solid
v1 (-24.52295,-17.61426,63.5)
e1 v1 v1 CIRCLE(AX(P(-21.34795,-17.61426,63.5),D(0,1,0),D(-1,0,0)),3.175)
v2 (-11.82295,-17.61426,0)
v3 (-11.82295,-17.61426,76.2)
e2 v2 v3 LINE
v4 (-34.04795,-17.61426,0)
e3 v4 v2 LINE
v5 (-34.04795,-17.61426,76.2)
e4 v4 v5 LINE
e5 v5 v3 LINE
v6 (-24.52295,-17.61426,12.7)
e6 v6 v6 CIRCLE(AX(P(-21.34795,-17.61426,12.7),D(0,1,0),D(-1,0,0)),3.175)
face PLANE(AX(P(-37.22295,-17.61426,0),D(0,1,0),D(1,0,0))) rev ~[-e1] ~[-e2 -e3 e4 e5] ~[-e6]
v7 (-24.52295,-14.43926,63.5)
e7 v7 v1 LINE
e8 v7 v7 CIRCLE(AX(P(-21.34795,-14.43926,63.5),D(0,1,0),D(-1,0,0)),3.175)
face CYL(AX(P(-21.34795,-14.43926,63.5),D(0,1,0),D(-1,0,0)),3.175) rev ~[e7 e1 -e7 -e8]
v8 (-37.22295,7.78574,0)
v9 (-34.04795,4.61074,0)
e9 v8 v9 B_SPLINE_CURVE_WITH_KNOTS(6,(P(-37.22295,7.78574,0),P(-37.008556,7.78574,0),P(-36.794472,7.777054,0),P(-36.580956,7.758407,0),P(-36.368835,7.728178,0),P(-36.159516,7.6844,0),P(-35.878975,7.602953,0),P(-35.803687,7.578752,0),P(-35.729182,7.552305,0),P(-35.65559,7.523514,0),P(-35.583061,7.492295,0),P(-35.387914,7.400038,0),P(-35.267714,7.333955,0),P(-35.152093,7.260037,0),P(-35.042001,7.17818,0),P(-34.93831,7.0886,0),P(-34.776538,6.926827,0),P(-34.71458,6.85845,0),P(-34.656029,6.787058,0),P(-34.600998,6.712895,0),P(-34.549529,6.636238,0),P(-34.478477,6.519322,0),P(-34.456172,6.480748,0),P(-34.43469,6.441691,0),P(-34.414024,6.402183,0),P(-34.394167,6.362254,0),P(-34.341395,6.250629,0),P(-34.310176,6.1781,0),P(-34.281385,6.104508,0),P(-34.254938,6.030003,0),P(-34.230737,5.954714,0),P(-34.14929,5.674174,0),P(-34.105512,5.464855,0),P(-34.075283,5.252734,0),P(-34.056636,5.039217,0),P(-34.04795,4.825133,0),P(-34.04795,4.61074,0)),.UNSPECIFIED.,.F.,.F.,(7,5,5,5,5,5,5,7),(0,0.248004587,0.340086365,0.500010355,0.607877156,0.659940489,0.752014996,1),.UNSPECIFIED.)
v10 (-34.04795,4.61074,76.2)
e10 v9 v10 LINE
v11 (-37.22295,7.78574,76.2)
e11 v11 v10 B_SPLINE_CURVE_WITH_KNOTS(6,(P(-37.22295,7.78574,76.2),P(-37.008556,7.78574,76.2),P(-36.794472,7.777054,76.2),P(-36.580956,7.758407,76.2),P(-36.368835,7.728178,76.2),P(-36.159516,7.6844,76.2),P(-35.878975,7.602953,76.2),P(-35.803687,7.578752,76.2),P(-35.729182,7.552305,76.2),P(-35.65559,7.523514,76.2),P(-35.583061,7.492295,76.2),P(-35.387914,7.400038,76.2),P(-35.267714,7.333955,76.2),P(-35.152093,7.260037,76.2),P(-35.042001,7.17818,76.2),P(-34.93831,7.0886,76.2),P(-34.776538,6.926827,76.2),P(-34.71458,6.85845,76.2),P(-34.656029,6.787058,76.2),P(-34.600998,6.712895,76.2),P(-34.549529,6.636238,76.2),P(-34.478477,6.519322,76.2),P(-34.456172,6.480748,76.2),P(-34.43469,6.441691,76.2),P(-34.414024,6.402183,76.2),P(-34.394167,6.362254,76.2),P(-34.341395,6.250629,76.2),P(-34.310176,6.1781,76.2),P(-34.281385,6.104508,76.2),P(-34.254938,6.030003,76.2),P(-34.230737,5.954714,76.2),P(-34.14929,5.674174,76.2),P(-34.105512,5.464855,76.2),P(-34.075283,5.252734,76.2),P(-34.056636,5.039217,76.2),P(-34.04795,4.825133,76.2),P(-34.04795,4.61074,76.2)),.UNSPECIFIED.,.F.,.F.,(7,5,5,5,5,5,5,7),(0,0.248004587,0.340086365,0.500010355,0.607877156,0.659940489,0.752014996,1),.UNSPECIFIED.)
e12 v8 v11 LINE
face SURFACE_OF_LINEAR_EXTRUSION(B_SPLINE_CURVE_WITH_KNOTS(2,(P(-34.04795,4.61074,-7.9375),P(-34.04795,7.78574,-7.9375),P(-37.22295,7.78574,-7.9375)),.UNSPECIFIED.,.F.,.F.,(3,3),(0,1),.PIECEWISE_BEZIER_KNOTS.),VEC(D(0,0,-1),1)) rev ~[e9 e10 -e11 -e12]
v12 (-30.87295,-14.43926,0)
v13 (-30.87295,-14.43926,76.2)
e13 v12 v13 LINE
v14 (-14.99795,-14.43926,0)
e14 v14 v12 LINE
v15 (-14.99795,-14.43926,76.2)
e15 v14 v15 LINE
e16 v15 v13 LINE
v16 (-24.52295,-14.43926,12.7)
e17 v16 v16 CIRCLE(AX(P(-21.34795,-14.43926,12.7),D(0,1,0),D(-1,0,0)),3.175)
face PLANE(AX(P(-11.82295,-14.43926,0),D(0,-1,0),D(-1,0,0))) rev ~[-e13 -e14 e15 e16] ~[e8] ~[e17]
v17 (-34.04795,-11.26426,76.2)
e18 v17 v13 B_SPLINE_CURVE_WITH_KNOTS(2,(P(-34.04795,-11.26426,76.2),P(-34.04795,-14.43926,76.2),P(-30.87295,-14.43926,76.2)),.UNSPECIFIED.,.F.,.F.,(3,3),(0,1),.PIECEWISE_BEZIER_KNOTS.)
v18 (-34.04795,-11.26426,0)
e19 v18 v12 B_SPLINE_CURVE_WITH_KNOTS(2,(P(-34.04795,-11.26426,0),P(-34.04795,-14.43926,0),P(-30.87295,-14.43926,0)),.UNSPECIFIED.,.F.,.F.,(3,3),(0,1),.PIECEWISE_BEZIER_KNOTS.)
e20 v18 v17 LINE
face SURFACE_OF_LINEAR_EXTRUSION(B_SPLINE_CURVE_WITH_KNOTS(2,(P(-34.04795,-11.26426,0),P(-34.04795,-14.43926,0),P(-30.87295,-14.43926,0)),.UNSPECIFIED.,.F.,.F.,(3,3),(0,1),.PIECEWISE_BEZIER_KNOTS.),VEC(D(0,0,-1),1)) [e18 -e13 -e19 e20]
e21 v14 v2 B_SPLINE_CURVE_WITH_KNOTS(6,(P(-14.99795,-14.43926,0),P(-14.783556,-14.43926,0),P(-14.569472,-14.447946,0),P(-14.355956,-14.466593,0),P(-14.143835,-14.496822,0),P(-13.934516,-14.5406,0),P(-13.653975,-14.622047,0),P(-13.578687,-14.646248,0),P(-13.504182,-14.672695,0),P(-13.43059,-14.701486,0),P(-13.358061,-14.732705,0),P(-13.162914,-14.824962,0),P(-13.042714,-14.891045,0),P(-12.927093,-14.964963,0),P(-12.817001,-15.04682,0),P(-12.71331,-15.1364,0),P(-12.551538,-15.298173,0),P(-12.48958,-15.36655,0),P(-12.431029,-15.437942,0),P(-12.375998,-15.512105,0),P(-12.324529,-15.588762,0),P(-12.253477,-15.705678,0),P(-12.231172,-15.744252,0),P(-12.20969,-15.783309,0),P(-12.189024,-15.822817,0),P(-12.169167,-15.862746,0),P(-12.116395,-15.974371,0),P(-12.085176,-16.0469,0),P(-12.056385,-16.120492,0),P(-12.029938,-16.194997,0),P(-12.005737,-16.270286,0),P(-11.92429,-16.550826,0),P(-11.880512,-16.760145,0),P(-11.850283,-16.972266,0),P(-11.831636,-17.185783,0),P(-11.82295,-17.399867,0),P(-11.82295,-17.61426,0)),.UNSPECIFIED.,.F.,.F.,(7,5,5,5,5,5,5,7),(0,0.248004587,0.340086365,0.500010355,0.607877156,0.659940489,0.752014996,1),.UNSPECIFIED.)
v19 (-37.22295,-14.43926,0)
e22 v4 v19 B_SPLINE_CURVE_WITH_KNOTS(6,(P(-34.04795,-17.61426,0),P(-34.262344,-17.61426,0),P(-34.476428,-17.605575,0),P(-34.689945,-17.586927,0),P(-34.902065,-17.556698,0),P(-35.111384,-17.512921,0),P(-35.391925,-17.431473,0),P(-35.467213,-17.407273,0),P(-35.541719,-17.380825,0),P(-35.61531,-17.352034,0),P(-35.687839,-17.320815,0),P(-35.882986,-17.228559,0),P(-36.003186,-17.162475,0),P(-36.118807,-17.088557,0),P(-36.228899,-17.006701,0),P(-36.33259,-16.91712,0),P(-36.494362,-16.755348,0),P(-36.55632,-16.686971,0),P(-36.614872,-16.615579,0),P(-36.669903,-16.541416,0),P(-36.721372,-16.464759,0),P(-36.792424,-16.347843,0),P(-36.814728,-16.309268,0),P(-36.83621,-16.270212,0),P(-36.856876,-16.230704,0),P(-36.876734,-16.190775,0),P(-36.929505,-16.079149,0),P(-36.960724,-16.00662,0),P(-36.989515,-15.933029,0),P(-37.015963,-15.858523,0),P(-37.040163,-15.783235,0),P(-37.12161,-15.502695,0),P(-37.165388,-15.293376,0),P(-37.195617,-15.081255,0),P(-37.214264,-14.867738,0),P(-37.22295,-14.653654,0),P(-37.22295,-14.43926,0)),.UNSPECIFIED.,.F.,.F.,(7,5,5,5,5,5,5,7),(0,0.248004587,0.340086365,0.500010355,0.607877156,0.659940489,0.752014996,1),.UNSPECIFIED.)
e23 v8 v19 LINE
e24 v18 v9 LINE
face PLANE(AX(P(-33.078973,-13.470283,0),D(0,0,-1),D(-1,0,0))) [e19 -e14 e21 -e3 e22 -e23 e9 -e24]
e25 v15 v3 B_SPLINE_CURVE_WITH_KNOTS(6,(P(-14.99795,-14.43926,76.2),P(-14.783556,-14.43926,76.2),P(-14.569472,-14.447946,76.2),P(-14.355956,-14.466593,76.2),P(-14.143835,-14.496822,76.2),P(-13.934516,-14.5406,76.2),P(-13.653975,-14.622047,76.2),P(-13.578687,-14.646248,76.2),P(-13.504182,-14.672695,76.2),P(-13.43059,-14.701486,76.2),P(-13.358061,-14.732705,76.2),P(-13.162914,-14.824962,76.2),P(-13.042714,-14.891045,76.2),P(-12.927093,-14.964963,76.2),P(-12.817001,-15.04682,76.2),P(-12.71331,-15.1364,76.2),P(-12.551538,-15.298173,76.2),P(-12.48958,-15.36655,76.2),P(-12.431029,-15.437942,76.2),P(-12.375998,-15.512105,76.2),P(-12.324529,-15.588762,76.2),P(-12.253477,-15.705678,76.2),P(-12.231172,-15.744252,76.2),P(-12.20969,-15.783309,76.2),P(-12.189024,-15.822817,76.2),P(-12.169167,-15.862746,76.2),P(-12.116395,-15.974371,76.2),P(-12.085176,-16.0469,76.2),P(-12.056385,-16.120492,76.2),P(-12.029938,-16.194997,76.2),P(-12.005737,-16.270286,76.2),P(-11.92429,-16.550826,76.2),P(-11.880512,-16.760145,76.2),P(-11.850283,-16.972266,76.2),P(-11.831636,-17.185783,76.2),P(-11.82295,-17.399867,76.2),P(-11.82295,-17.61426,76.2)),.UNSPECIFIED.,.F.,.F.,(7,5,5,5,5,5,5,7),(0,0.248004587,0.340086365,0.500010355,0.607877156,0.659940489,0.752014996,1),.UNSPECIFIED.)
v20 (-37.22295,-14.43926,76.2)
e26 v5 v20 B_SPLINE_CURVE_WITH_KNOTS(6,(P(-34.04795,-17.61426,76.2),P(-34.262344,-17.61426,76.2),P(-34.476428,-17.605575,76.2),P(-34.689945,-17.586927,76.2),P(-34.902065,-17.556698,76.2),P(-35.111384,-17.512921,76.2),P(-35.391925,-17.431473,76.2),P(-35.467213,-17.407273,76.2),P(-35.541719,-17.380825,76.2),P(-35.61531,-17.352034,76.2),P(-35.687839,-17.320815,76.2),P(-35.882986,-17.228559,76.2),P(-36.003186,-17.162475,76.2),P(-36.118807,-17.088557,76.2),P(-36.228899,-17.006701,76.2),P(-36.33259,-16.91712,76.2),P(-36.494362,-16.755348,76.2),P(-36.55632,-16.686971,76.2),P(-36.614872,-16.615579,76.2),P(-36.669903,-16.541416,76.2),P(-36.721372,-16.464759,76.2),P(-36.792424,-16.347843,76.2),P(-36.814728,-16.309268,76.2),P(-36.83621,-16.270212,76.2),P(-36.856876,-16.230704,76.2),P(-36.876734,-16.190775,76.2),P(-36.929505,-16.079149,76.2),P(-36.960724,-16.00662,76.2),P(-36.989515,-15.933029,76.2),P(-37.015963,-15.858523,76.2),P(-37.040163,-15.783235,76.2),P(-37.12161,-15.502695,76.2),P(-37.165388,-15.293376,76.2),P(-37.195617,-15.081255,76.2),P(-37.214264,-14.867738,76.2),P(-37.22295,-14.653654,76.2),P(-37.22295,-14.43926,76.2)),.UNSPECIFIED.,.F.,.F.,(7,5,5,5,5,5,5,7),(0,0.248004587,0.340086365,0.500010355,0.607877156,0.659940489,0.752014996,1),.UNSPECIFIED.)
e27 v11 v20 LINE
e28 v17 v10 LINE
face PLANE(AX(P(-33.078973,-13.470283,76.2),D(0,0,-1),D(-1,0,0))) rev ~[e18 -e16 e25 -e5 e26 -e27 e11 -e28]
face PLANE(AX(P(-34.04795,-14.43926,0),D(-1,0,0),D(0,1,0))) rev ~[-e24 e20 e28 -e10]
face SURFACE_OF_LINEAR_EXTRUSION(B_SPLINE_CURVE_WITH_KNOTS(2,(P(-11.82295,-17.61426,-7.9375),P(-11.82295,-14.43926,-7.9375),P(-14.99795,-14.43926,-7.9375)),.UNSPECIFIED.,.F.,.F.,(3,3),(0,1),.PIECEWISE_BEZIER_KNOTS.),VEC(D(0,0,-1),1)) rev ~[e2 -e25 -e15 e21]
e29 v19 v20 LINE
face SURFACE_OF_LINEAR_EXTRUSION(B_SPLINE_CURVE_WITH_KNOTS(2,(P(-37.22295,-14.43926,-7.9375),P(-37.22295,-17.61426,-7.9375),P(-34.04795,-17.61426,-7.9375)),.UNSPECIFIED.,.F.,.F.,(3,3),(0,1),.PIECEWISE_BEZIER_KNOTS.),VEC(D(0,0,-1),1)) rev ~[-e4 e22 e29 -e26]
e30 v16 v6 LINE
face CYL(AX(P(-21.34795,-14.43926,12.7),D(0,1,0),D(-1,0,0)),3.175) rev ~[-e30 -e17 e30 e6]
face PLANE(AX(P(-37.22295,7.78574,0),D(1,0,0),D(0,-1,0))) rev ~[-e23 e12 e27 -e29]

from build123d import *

# Parameters (mm, degrees)
F1_DEPTH    = 76.2
F2_R        = 3.175
F3_DEPTH    = 3.175
F4_T1_DEPTH = 76.2
F4_T3_DEPTH = 92.075


# Not quite as in the source:
# - a fillet or chamfer that OpenCascade refuses, or shapes differently, is made with other operations: its cross-section is extruded or revolved along the edge and cut away or added


with BuildPart() as f1:
    # F0 (on Top) → F1 (new body)
    with BuildSketch(Plane.XY):
        Polygon((-34.0479501394, 7.7857396193), (-37.2229501394, 7.7857396193), (-37.2229501394, -17.6142603807), (-11.8229501394, -17.6142603807), (-11.8229501394, -14.4392603807), (-34.0479501394, -14.4392603807), align=None)
    extrude(amount=F1_DEPTH)

    # F2 (on face) → F3 (cut)
    with BuildSketch(Plane(origin=(0, -14.4392603807, 0), x_dir=(-1, 0, 0), z_dir=(0, 1, 0))):
        with Locations((21.3479501394, 63.5)):
            Circle(F2_R)
        with Locations((21.3479501394, 12.7)):
            Circle(F2_R)
    extrude(amount=-F3_DEPTH, mode=Mode.SUBTRACT)

    # F4: fillet of radius 3.175 on 4 edges, made by hand

    # F4_s2 → F4_t1 (join)
    with BuildSketch(Plane.XY):
        with BuildLine():
            add(Edge.make_bspline(
                [(-34.0479501394, -11.2642603807), (-34.0479501394, -14.4392603807), (-30.8729501394, -14.4392603807)],
                knots=[0, 0, 0, 1, 1, 1], degree=2, weights=[1, 1, 1]))
            Line((-30.8729501394, -14.4392603807), (-34.0479501394, -14.4392603807))
            Line((-34.0479501394, -14.4392603807), (-34.0479501394, -11.2642603807))
        make_face()
    extrude(amount=F4_T1_DEPTH)

    # F4_s4 → F4_t3 (cut)
    with BuildSketch(Plane.XY.offset(-7.9375)):
        with BuildLine():
            add(Edge.make_bspline(
                [(-11.8229501394, -17.6142603807), (-11.8229501394, -14.4392603807), (-14.9979501394, -14.4392603807)],
                knots=[0, 0, 0, 1, 1, 1], degree=2, weights=[1, 1, 1]))
            Line((-14.9979501394, -14.4392603807), (-11.8229501394, -14.4392603807))
            Line((-11.8229501394, -14.4392603807), (-11.8229501394, -17.6142603807))
        make_face()
        with BuildLine():
            add(Edge.make_bspline(
                [(-34.0479501394, 4.6107396193), (-34.0479501394, 7.7857396193), (-37.2229501394, 7.7857396193)],
                knots=[0, 0, 0, 1, 1, 1], degree=2, weights=[1, 1, 1]))
            Line((-37.2229501394, 7.7857396193), (-34.0479501394, 7.7857396193))
            Line((-34.0479501394, 7.7857396193), (-34.0479501394, 4.6107396193))
        make_face()
        with BuildLine():
            add(Edge.make_bspline(
                [(-37.2229501394, -14.4392603807), (-37.2229501394, -17.6142603807), (-34.0479501394, -17.6142603807)],
                knots=[0, 0, 0, 1, 1, 1], degree=2, weights=[1, 1, 1]))
            Line((-34.0479501394, -17.6142603807), (-37.2229501394, -17.6142603807))
            Line((-37.2229501394, -17.6142603807), (-37.2229501394, -14.4392603807))
        make_face()
    extrude(amount=F4_T3_DEPTH, mode=Mode.SUBTRACT)


solid = f1.part
